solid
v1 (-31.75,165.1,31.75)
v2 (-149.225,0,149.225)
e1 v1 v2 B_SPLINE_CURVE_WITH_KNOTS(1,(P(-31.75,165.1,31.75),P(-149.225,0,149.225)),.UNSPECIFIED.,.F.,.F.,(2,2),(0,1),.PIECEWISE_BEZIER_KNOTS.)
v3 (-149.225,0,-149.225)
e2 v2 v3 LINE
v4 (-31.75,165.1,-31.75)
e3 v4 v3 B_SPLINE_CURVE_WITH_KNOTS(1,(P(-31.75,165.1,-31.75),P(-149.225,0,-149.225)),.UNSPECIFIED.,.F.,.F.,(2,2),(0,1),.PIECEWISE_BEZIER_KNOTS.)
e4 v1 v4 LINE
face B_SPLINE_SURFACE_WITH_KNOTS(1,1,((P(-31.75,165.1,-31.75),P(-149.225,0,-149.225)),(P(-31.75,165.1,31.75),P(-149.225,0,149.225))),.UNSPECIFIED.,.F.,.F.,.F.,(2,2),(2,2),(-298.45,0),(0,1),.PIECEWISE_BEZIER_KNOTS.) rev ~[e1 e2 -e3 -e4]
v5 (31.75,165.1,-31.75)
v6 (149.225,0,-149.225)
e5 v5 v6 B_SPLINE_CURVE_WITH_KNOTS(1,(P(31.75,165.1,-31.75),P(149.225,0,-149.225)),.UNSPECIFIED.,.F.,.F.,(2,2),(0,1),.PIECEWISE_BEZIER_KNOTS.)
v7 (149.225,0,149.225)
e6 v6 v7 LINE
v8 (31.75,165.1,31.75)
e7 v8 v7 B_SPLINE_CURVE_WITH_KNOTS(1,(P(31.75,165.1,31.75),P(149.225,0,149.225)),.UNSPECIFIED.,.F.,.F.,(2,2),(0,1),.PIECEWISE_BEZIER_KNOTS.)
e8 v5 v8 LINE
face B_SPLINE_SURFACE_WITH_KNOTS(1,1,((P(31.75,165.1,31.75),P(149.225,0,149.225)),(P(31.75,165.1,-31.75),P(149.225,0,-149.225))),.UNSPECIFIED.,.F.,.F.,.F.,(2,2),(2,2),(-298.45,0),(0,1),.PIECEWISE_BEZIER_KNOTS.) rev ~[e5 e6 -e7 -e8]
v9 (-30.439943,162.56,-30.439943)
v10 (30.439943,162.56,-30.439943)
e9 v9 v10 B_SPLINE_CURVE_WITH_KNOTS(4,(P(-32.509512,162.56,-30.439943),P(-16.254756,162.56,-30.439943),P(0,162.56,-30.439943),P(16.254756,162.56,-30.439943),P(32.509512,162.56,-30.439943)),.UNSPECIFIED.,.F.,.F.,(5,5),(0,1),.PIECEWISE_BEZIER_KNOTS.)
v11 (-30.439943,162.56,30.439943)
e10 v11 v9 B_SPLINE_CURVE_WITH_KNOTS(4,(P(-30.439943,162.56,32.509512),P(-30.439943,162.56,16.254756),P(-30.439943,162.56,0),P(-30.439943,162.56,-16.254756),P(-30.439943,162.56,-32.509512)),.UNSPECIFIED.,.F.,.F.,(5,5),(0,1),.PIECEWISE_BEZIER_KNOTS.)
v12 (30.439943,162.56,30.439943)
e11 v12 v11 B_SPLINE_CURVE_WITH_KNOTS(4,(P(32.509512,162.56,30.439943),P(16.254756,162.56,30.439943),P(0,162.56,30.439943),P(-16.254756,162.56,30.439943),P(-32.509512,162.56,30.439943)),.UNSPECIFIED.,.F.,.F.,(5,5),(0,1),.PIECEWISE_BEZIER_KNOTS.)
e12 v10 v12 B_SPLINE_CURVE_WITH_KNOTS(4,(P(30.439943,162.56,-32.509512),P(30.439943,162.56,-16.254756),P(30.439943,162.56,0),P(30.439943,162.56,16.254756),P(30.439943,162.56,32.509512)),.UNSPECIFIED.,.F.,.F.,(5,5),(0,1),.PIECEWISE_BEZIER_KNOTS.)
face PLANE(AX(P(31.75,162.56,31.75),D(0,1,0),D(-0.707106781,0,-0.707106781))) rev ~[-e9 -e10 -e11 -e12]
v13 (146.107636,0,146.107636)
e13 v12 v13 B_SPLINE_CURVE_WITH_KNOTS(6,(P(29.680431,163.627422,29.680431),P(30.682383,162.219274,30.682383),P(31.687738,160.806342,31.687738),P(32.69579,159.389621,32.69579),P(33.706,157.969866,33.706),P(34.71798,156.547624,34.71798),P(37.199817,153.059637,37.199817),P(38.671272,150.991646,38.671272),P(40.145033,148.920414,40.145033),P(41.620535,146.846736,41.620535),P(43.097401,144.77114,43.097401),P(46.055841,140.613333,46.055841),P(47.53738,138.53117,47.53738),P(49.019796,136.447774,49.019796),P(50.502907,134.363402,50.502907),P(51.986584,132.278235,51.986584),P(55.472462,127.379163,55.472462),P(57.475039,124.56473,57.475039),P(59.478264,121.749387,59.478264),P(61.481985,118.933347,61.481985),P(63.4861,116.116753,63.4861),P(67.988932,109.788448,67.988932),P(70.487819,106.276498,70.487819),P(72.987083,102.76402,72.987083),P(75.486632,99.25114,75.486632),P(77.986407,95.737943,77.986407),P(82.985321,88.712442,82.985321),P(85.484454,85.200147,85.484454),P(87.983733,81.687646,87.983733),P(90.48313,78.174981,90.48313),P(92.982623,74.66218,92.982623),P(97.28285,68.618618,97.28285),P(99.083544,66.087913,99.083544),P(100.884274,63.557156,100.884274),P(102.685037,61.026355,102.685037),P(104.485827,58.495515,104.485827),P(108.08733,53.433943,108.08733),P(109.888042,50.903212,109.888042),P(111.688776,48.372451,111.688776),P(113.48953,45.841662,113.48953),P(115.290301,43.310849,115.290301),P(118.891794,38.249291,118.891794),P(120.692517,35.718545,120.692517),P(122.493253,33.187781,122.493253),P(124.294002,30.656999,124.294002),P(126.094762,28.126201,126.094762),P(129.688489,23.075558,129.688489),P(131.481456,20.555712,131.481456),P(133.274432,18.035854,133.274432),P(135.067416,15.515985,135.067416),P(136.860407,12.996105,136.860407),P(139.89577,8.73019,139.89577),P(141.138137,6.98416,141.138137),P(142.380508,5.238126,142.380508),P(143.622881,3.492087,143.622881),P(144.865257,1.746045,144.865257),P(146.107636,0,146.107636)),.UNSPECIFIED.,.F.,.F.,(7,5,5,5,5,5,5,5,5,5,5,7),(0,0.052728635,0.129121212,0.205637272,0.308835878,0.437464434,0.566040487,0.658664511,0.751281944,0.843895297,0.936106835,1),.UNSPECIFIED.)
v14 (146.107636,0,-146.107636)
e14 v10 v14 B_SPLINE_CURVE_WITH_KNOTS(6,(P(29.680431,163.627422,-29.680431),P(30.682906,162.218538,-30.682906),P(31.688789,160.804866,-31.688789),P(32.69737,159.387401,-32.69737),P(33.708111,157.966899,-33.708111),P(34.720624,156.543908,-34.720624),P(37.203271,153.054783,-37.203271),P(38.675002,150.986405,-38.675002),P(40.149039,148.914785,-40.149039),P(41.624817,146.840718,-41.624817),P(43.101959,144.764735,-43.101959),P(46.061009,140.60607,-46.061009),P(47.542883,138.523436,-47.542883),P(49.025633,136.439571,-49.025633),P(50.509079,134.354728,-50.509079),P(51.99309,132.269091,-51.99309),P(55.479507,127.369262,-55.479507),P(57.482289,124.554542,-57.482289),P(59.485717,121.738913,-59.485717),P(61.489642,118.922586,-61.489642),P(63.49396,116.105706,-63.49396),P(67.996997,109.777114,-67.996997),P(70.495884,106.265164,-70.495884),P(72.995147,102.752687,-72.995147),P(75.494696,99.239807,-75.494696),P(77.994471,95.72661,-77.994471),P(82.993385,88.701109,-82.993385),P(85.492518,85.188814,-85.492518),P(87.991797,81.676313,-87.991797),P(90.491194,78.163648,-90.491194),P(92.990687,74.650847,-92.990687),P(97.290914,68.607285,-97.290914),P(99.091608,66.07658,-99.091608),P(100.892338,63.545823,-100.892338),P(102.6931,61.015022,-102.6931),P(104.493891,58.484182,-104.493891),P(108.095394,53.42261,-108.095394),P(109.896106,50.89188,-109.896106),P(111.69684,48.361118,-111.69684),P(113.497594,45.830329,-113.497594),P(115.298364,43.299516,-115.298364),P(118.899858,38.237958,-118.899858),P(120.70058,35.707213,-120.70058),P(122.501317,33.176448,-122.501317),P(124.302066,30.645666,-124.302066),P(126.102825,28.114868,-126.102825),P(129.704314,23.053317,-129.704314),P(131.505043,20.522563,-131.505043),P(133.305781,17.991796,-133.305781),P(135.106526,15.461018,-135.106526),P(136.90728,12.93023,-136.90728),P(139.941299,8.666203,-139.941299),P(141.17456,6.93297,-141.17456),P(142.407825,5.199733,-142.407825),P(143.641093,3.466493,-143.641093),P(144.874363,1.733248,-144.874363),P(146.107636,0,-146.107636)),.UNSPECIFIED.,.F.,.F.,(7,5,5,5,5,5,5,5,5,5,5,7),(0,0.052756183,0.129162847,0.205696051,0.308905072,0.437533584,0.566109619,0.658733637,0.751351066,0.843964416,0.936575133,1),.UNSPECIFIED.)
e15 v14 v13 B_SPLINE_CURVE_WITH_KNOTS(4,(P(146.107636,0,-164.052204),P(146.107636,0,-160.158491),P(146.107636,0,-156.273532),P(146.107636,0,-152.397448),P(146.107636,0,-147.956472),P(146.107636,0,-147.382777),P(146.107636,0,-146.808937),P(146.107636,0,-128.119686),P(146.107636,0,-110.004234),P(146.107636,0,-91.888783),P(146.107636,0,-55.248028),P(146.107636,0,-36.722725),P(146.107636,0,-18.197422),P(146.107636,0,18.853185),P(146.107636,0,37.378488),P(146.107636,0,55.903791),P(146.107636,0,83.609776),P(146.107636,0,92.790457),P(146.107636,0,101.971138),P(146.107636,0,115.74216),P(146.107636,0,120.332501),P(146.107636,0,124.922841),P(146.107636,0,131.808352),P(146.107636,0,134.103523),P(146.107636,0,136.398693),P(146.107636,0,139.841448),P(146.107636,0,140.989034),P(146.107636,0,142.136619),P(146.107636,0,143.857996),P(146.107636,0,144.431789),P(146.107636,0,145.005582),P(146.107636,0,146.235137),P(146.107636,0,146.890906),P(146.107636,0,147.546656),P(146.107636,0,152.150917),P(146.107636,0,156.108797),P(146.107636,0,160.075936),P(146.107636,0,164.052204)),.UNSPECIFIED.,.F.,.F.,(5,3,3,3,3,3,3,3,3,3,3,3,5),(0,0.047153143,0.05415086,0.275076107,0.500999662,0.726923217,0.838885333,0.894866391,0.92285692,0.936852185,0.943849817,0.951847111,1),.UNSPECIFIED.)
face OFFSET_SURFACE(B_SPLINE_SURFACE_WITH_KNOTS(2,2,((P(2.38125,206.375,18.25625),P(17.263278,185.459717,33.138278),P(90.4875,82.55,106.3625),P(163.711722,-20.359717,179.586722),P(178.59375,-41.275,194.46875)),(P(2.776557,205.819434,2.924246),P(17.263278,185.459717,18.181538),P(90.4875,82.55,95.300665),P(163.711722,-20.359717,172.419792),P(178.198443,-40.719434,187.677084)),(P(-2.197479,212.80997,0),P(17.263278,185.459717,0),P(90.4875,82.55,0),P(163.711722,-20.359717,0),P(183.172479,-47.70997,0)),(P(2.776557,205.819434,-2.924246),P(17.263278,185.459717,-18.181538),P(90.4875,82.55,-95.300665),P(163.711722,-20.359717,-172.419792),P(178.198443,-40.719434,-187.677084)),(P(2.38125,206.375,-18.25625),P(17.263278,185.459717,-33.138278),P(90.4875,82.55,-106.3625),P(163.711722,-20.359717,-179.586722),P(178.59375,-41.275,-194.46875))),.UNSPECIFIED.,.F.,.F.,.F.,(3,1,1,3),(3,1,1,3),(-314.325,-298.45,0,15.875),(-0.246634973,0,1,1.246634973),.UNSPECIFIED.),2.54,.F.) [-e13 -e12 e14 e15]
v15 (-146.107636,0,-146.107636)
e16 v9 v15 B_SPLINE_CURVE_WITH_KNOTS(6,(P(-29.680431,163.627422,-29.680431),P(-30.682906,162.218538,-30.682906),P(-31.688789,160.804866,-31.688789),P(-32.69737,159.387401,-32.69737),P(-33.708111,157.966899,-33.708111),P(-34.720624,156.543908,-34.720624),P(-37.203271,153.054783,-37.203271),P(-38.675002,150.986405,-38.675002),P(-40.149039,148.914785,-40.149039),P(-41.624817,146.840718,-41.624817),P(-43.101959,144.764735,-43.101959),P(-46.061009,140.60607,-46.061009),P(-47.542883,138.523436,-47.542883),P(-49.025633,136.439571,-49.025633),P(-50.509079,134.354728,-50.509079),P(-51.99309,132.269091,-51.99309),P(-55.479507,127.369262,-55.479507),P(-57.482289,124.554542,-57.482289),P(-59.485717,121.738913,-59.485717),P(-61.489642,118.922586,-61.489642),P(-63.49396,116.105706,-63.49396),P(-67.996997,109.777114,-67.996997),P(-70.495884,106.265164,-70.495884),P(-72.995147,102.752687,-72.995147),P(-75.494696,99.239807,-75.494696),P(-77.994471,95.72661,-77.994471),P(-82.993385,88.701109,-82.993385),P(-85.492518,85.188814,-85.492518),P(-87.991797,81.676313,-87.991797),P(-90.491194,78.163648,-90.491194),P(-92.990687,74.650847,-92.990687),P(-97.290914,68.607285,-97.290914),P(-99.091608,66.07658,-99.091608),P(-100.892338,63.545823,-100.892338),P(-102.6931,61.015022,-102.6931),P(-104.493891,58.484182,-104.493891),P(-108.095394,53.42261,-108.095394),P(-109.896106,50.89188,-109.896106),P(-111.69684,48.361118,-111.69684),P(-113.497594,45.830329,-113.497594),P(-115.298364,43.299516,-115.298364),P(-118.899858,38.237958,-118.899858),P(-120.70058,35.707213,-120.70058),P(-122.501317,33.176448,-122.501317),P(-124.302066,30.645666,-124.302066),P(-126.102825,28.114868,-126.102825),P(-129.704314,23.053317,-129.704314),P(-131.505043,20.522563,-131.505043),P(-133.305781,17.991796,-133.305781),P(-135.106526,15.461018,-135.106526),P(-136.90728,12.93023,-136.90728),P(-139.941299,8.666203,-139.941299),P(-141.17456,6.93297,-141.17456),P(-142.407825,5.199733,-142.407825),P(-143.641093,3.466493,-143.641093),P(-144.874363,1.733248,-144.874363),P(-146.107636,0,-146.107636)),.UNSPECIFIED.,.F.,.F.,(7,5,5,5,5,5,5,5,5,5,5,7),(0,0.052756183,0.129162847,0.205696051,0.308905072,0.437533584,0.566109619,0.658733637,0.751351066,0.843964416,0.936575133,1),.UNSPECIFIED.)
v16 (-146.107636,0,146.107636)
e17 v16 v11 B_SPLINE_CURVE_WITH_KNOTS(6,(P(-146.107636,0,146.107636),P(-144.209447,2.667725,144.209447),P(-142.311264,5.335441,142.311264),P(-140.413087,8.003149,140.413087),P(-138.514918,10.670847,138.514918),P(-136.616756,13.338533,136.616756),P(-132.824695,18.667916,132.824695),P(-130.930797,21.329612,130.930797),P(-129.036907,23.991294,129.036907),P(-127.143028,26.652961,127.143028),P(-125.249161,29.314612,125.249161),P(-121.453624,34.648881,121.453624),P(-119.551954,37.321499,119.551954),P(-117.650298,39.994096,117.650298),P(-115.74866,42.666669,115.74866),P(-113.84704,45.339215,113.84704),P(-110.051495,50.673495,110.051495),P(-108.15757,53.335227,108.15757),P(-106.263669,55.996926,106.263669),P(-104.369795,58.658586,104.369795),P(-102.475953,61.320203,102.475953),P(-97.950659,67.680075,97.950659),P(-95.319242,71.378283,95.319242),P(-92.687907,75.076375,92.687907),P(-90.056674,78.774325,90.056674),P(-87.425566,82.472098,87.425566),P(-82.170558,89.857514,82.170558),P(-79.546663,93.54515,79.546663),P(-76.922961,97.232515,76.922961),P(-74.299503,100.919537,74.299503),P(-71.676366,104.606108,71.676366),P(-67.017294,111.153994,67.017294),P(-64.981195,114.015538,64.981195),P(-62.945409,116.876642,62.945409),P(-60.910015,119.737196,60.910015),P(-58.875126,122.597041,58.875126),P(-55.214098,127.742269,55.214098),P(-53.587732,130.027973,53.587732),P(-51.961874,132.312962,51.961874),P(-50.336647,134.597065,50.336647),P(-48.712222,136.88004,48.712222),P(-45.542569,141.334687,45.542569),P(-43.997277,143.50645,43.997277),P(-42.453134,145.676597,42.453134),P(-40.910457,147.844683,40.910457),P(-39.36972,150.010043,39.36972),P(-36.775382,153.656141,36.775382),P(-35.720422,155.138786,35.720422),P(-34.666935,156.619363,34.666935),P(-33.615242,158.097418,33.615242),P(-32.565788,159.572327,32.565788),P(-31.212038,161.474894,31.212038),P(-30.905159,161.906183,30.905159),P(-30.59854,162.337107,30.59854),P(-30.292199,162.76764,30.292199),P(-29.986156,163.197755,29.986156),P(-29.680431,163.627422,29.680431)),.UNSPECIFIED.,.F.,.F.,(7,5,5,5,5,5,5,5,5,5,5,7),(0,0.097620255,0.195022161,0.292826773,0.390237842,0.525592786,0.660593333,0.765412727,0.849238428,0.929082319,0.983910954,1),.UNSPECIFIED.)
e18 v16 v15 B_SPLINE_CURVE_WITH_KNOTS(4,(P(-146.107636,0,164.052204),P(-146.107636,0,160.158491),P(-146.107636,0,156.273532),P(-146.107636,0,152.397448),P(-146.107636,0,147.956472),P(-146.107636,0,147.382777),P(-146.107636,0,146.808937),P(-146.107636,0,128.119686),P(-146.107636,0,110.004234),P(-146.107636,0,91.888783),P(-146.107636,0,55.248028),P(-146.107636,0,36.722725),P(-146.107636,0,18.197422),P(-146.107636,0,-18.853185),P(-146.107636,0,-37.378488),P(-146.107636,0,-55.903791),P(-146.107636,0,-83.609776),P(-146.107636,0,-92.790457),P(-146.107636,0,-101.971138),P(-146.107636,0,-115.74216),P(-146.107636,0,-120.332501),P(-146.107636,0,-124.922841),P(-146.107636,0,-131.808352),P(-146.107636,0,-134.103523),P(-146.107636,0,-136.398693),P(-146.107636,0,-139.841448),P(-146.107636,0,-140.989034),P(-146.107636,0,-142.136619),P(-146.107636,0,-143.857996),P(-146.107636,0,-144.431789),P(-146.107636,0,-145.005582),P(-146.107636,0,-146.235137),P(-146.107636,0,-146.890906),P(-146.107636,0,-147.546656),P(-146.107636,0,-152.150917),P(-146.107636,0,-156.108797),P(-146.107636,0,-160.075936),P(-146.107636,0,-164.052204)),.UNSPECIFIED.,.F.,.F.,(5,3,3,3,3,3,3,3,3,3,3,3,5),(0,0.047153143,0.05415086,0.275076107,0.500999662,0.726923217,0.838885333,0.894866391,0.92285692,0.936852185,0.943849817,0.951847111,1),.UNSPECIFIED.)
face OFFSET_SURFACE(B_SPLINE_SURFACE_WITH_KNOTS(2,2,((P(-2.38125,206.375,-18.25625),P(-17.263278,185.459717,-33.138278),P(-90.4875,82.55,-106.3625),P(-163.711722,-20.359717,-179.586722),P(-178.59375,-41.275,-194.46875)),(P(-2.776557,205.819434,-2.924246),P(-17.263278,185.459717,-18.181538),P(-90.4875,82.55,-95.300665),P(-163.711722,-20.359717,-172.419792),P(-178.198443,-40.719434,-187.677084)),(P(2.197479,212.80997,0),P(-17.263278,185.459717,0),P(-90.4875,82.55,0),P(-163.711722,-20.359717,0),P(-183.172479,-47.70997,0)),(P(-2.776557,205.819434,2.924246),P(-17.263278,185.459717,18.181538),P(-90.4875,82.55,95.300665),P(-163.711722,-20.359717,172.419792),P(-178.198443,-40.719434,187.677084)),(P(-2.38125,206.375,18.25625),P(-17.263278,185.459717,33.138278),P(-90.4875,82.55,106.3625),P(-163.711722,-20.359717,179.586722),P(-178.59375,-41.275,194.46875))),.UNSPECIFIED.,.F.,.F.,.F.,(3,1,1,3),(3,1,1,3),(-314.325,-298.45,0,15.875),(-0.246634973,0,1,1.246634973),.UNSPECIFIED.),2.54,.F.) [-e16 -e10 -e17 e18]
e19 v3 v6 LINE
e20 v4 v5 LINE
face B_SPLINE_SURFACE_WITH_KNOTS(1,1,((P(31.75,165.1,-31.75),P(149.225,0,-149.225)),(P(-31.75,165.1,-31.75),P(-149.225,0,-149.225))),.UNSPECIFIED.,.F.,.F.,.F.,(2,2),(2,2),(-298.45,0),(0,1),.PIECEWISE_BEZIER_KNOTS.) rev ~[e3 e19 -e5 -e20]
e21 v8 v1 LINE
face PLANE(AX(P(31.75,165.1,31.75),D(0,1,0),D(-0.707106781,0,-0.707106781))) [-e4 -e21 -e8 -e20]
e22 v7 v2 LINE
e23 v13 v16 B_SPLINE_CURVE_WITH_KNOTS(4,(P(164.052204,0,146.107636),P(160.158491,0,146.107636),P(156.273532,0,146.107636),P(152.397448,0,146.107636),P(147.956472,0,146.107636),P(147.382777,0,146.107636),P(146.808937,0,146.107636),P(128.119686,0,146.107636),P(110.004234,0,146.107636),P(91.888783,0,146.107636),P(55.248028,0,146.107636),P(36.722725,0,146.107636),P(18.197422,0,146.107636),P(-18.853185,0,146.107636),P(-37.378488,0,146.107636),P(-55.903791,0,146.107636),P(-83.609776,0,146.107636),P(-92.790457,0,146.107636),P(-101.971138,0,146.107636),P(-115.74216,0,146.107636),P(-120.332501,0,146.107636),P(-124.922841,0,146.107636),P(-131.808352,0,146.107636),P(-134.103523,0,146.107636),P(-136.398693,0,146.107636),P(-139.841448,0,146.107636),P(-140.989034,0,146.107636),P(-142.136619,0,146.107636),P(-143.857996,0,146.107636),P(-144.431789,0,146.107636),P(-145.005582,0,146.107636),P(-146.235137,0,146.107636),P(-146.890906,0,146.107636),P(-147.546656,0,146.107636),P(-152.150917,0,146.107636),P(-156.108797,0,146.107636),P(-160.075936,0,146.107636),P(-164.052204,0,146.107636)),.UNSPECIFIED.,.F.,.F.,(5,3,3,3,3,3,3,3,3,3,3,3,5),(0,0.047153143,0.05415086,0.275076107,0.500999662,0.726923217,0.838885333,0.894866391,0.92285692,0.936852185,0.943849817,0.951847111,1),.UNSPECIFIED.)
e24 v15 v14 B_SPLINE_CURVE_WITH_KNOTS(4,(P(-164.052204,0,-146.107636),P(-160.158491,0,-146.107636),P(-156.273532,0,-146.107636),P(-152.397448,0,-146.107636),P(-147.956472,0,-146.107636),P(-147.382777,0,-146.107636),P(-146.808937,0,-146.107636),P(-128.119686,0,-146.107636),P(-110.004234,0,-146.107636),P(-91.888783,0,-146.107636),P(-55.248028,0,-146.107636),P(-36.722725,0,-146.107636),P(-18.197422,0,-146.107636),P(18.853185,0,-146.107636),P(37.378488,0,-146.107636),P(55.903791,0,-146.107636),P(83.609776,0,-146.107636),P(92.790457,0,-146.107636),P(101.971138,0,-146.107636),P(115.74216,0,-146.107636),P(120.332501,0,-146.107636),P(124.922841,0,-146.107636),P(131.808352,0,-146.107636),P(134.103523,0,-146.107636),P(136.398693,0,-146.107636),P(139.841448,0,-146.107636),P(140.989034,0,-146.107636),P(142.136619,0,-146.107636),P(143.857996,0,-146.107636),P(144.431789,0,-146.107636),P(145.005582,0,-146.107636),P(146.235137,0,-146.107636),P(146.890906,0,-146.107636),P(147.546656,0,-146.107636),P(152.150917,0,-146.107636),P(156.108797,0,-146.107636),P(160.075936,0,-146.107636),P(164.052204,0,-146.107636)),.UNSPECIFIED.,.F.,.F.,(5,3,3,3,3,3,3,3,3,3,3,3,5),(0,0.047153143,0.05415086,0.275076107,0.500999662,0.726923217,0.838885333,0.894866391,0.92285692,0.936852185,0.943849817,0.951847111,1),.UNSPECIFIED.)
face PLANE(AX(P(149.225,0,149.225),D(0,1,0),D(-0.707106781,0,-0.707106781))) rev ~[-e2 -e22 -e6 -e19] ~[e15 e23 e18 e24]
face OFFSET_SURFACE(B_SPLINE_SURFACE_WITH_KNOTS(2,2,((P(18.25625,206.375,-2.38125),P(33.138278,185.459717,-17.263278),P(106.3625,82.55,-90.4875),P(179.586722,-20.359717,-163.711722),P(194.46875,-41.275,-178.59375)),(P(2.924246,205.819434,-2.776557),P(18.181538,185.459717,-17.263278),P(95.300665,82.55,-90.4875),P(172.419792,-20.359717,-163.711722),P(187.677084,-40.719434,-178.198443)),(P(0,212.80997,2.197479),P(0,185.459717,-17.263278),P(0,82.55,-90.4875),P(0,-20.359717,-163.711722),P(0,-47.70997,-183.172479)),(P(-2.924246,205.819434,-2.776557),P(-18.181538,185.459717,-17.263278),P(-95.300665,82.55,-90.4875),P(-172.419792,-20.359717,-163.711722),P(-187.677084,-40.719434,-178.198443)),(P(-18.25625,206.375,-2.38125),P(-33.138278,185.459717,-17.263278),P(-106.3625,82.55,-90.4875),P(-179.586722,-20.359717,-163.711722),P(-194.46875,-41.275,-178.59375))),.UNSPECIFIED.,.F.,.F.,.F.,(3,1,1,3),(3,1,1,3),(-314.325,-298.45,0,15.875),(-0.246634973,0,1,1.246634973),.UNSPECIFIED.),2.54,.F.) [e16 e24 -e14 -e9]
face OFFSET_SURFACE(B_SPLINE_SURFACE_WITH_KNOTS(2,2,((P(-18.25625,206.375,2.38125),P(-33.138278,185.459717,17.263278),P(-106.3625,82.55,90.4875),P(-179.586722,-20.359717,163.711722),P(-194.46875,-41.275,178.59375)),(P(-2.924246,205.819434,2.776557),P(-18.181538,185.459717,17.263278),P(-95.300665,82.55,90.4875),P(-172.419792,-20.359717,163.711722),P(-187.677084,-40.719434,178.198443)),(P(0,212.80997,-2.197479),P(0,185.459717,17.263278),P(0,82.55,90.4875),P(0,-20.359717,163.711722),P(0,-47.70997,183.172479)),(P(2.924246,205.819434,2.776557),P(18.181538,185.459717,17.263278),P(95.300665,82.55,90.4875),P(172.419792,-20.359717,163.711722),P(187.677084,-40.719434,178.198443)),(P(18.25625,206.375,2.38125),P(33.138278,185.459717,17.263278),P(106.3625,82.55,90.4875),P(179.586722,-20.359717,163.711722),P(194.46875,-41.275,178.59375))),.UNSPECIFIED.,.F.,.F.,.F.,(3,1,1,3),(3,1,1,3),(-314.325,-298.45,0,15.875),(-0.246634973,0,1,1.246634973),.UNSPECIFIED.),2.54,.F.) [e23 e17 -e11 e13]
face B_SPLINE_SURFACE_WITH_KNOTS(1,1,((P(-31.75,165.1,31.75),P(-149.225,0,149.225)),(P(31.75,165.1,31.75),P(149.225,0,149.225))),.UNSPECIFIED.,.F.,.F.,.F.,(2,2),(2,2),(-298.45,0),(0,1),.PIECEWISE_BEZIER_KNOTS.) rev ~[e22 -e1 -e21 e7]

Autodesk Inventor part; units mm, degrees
ref_plane "YZ Plane" through (0, 0, 0) normal (1, 0, 0) x (0, 1, 0)
ref_plane "XY Plane" through (0, 0, 0) normal (0, 0, 1) x (1, 0, 0)
sketch "Sketch1" plane through (0, 0, 0) normal (0, 1, 0) x (-1, 0, 0)
  line L0 (-149.225, 149.225) -> (149.225, 149.225)
  line L1 (149.225, 149.225) -> (149.225, -149.225)
  line L2 (149.225, -149.225) -> (-149.225, -149.225)
  line L3 (-149.225, -149.225) -> (-149.225, 149.225)
  line L4 (-149.225, 149.225) -> (149.225, -149.225) construction
  line L5 (149.225, 149.225) -> (-149.225, -149.225) construction
  point P0 (0, 0)
  dimension "d0" = 298.45
  dimension "d1" = 298.45
ref_plane "Work Plane1" through (0, 165.1, 0) normal (0, 1, 0) x (-1, 0, 0)
sketch "Sketch2" plane through (0, 165.1, 0) normal (0, 1, 0) x (-1, 0, 0)
  line L0 (-31.75, 31.75) -> (31.75, 31.75)
  line L1 (31.75, 31.75) -> (31.75, -31.75)
  line L2 (31.75, -31.75) -> (-31.75, -31.75)
  line L3 (-31.75, -31.75) -> (-31.75, 31.75)
  line L4 (-31.75, 31.75) -> (31.75, -31.75) construction
  line L5 (31.75, 31.75) -> (-31.75, -31.75) construction
  point P0 (0, 0)
  dimension "d3" = 63.5
  dimension "d4" = 63.5
loft "Loft1" add profiles "Sketch2", "Sketch1"
shell "Shell1" thickness 2.54 removed faces 1 at (-49.7417, 0, -49.7417)
properties part number "hologram pyramid (for assembly)"
